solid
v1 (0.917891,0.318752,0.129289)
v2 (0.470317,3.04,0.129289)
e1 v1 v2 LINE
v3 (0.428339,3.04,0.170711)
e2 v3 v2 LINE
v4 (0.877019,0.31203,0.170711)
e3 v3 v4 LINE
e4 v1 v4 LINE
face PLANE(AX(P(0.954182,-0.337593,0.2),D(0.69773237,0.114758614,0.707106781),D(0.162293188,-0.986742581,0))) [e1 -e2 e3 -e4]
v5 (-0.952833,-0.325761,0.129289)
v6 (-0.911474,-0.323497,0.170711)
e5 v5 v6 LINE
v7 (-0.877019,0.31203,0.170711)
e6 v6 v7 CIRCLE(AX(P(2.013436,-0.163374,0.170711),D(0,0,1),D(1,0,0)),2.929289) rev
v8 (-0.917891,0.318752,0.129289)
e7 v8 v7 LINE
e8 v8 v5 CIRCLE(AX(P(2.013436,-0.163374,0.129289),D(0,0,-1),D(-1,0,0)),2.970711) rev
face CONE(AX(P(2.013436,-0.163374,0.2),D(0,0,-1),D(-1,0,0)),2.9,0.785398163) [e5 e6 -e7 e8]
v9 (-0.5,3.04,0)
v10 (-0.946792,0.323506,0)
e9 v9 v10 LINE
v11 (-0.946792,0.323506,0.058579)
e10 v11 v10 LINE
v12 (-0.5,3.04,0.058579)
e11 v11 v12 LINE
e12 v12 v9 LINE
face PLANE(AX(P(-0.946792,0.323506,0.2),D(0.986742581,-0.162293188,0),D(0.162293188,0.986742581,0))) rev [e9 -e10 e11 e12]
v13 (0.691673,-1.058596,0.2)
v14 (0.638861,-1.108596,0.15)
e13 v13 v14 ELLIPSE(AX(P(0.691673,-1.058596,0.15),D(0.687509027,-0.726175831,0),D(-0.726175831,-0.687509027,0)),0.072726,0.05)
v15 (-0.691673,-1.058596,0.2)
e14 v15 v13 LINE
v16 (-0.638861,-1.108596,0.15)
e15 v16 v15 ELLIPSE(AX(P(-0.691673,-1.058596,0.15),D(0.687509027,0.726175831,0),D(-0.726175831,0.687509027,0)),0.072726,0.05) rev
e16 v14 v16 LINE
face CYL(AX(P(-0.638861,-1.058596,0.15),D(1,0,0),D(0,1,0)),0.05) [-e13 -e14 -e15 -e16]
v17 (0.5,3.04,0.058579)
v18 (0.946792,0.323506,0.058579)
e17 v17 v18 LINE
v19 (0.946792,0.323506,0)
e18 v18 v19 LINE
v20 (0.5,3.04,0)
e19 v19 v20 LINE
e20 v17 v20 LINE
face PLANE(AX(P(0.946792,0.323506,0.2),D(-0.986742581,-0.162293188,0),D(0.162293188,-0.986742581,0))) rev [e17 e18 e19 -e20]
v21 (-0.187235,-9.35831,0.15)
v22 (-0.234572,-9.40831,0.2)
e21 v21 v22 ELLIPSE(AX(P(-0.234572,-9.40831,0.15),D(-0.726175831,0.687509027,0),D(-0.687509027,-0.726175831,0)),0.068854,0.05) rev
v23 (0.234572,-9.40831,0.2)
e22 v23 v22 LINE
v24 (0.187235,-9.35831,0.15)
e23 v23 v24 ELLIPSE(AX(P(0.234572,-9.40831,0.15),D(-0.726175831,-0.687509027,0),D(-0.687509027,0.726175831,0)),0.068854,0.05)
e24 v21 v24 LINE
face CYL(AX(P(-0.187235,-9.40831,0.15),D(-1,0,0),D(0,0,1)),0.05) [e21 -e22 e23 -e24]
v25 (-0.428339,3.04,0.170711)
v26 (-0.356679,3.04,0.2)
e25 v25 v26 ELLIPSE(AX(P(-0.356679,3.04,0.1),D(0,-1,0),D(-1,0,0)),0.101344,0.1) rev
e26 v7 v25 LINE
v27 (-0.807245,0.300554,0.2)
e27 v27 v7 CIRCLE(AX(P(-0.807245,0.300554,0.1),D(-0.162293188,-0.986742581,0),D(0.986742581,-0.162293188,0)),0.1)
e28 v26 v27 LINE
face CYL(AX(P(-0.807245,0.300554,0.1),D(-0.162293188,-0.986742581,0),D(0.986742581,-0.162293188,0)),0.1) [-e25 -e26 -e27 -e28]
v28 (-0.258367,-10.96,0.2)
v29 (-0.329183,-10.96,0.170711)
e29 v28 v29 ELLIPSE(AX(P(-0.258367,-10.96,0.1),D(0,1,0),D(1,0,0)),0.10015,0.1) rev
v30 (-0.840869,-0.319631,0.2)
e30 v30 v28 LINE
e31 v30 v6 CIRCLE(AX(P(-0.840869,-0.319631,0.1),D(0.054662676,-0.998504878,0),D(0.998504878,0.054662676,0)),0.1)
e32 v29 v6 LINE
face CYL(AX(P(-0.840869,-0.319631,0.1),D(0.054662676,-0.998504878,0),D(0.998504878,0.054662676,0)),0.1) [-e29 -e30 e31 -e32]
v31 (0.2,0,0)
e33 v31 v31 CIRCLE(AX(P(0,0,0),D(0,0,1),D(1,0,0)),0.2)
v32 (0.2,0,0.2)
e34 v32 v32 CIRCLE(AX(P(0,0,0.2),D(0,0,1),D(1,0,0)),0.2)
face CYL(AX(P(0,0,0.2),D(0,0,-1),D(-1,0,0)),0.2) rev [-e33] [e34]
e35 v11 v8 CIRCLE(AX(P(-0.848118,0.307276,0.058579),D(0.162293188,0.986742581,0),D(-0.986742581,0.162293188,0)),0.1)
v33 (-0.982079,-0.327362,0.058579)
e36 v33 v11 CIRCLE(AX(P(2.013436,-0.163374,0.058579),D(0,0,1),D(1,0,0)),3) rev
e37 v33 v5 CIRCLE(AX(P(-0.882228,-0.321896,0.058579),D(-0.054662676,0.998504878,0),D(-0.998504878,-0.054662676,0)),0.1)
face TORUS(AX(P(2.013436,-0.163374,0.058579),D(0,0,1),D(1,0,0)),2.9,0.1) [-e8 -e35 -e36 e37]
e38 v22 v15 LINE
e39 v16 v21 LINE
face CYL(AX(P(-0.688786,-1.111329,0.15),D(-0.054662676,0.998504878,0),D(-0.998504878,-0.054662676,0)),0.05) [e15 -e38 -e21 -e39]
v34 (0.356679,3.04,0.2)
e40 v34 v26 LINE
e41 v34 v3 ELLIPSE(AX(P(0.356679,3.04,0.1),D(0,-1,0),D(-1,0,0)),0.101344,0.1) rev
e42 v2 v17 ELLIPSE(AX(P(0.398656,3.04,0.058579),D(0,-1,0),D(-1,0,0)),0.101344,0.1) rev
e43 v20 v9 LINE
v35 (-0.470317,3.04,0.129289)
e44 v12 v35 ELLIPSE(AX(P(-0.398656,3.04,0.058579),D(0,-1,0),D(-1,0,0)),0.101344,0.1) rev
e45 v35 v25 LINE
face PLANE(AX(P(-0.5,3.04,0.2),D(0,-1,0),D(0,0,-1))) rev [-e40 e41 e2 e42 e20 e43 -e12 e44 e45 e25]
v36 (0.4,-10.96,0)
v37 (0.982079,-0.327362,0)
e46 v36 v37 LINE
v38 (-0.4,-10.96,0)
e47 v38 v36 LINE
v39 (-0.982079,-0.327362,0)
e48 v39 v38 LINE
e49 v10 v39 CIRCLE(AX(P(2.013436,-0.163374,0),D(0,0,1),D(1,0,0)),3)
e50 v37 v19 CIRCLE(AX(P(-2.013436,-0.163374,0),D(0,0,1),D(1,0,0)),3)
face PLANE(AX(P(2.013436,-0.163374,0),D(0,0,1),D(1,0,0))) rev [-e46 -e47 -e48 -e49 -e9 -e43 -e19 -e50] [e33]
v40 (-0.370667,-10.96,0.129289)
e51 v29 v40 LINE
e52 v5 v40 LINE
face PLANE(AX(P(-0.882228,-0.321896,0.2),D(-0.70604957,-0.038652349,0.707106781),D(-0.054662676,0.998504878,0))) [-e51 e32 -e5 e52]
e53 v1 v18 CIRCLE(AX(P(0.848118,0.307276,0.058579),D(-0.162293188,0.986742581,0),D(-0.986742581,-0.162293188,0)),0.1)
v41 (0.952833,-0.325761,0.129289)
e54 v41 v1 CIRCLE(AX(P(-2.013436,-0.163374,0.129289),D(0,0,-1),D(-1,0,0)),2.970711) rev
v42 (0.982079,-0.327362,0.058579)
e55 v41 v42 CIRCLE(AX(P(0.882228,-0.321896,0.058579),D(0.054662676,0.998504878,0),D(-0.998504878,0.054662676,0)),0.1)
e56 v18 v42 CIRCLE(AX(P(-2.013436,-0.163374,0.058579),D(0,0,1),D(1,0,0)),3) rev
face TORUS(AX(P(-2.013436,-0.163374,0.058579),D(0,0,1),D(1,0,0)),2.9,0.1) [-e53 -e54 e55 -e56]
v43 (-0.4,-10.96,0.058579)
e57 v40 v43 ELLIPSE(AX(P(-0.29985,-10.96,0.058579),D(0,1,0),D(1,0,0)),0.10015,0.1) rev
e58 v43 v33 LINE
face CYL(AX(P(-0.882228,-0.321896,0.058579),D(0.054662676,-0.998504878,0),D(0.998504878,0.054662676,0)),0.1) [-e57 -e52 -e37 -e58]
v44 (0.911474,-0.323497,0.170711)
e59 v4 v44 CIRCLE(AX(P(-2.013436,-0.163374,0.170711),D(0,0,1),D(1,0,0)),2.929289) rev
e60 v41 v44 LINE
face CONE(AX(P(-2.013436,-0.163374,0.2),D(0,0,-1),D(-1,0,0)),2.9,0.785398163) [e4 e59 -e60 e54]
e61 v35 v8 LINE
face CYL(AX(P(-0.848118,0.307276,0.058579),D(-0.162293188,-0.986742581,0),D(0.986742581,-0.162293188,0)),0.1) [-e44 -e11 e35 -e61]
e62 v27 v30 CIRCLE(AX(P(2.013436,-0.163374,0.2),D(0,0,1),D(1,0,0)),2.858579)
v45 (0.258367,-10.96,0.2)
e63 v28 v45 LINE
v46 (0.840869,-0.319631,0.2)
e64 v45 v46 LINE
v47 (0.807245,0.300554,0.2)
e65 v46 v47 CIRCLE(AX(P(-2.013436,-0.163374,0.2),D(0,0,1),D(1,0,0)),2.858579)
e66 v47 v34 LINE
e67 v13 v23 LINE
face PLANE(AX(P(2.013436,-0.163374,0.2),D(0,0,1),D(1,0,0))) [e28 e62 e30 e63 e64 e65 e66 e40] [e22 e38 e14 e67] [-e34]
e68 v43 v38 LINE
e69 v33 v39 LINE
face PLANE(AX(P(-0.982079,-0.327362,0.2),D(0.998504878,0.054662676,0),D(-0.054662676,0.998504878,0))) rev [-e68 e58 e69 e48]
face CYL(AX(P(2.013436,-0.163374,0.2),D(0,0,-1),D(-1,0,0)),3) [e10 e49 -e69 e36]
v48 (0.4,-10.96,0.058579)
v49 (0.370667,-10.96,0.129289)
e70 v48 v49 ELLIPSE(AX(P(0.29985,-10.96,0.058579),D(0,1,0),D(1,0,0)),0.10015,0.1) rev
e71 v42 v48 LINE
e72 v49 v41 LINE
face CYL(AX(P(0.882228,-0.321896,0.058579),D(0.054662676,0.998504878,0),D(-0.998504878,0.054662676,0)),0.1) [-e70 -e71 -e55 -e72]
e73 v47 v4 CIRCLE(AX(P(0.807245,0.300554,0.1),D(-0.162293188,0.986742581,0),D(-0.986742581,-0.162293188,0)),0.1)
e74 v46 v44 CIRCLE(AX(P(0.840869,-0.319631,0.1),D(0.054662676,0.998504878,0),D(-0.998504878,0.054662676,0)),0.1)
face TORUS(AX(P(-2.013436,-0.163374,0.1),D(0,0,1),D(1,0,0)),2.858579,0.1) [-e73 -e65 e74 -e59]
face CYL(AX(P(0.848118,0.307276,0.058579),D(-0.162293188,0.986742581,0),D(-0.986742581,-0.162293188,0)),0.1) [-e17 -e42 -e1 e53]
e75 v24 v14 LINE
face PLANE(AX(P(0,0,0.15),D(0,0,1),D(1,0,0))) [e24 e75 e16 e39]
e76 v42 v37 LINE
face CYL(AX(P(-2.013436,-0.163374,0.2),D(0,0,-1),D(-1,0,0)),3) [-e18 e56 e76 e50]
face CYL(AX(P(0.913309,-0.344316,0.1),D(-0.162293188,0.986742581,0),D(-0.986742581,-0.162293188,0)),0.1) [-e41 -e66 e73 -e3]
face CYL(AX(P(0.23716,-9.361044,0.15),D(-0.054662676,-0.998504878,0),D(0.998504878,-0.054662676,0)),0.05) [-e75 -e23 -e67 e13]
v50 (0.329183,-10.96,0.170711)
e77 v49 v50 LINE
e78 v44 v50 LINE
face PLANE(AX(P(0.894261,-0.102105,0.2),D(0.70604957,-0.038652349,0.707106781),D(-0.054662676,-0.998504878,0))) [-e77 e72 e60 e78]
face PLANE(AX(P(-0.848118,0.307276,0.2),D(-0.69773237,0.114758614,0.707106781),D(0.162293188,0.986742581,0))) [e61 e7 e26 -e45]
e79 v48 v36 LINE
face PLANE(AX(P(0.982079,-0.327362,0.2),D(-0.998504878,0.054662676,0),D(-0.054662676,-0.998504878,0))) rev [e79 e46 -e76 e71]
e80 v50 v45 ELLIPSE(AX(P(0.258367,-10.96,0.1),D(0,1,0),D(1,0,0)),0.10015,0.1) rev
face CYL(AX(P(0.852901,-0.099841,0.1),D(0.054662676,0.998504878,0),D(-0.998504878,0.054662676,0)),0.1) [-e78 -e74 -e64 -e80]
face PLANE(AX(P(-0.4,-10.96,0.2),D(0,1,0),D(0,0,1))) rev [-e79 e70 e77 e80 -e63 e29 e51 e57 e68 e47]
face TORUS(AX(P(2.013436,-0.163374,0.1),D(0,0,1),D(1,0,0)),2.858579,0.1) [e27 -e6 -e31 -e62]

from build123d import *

# Parameters (mm, degrees)
SKETCH_1_R          = 0.2
EXTRUDE_1_DEPTH     = 0.2
CHAMFER_1_SIZE      = 0.1
CUT_EXTRUDE_1_DEPTH = 0.05
FILLET_1_R          = 0.1
FILLET_2_R          = 0.05


with BuildPart() as part:
    # Эскиз1 → Бобышка-Вытянуть1 (new body)
    with BuildSketch(Plane.XY):
        with BuildLine():
            Line((-0.946791834, 0.323505648), (-0.5, 3.04))
            Line((-0.5, 3.04), (0.5, 3.04))
            Line((0.5, 3.04), (0.946791834, 0.323505648))
            ThreePointArc((0.946791834, 0.323505648), (0.982164861, -0.000966935), (0.982078726, -0.327361942))
            Line((0.982078726, -0.327361942), (0.4, -10.96))
            Line((0.4, -10.96), (-0.4, -10.96))
            Line((-0.4, -10.96), (-0.982078726, -0.327361942))
            ThreePointArc((-0.982078726, -0.327361942), (-0.982164861, -0.000966935), (-0.946791834, 0.323505648))
        make_face()
        Circle(SKETCH_1_R, mode=Mode.SUBTRACT)
    extrude(amount=EXTRUDE_1_DEPTH)

    # Фаска1
    chamfer_1_edges = [part.edges().sort_by_distance(p)[0] for p in [
        (0.723395917, 1.681752824, 0.2),
        (-0.723395917, 1.681752824, 0.2),
        (-0.982164861, -0.000966935, 0.2),
        (-0.691039363, -5.643680971, 0.2),
        (0.691039363, -5.643680971, 0.2),
        (0.982164861, -0.000966935, 0.2),
    ]]
    chamfer(chamfer_1_edges, length=CHAMFER_1_SIZE)

    # Эскиз2 → Вырез-Вытянуть1 (cut)
    with BuildSketch(Plane.XY.offset(0.2)):
        Polygon((-0.638861233, -1.108595936), (-0.187234527, -9.358310432), (0.187234527, -9.358310432), (0.638861233, -1.108595936), align=None)
    extrude(amount=-CUT_EXTRUDE_1_DEPTH, mode=Mode.SUBTRACT)

    # Скругление1
    fillet_1_edges = [part.edges().sort_by_distance(p)[0] for p in [
        (-0.591039251, -5.640947837, 0.2),
        (-0.882311502, -0.006380501, 0.2),
        (-0.623387011, 1.673638165, 0.2),
        (0.623387011, 1.673638165, 0.2),
        (0.882311502, -0.006380501, 0.2),
        (0.591039251, -5.640947837, 0.2),
        (0.691039363, -5.643680971, 0.1),
        (0.982164861, -0.000966935, 0.1),
        (0.723395917, 1.681752824, 0.1),
        (-0.723395917, 1.681752824, 0.1),
        (-0.982164861, -0.000966935, 0.1),
        (-0.691039363, -5.643680971, 0.1),
    ]]
    fillet(fillet_1_edges, radius=FILLET_1_R)

    # Скругление2
    fillet_2_edges = [part.edges().sort_by_distance(p)[0] for p in [
        (0, -9.358310432, 0.2),
        (-0.41304788, -5.233453184, 0.2),
        (0.41304788, -5.233453184, 0.2),
        (0, -1.108595936, 0.2),
    ]]
    fillet(fillet_2_edges, radius=FILLET_2_R - 0.0001)  # a hair under: the kernel refuses the full size


solid = part.part
